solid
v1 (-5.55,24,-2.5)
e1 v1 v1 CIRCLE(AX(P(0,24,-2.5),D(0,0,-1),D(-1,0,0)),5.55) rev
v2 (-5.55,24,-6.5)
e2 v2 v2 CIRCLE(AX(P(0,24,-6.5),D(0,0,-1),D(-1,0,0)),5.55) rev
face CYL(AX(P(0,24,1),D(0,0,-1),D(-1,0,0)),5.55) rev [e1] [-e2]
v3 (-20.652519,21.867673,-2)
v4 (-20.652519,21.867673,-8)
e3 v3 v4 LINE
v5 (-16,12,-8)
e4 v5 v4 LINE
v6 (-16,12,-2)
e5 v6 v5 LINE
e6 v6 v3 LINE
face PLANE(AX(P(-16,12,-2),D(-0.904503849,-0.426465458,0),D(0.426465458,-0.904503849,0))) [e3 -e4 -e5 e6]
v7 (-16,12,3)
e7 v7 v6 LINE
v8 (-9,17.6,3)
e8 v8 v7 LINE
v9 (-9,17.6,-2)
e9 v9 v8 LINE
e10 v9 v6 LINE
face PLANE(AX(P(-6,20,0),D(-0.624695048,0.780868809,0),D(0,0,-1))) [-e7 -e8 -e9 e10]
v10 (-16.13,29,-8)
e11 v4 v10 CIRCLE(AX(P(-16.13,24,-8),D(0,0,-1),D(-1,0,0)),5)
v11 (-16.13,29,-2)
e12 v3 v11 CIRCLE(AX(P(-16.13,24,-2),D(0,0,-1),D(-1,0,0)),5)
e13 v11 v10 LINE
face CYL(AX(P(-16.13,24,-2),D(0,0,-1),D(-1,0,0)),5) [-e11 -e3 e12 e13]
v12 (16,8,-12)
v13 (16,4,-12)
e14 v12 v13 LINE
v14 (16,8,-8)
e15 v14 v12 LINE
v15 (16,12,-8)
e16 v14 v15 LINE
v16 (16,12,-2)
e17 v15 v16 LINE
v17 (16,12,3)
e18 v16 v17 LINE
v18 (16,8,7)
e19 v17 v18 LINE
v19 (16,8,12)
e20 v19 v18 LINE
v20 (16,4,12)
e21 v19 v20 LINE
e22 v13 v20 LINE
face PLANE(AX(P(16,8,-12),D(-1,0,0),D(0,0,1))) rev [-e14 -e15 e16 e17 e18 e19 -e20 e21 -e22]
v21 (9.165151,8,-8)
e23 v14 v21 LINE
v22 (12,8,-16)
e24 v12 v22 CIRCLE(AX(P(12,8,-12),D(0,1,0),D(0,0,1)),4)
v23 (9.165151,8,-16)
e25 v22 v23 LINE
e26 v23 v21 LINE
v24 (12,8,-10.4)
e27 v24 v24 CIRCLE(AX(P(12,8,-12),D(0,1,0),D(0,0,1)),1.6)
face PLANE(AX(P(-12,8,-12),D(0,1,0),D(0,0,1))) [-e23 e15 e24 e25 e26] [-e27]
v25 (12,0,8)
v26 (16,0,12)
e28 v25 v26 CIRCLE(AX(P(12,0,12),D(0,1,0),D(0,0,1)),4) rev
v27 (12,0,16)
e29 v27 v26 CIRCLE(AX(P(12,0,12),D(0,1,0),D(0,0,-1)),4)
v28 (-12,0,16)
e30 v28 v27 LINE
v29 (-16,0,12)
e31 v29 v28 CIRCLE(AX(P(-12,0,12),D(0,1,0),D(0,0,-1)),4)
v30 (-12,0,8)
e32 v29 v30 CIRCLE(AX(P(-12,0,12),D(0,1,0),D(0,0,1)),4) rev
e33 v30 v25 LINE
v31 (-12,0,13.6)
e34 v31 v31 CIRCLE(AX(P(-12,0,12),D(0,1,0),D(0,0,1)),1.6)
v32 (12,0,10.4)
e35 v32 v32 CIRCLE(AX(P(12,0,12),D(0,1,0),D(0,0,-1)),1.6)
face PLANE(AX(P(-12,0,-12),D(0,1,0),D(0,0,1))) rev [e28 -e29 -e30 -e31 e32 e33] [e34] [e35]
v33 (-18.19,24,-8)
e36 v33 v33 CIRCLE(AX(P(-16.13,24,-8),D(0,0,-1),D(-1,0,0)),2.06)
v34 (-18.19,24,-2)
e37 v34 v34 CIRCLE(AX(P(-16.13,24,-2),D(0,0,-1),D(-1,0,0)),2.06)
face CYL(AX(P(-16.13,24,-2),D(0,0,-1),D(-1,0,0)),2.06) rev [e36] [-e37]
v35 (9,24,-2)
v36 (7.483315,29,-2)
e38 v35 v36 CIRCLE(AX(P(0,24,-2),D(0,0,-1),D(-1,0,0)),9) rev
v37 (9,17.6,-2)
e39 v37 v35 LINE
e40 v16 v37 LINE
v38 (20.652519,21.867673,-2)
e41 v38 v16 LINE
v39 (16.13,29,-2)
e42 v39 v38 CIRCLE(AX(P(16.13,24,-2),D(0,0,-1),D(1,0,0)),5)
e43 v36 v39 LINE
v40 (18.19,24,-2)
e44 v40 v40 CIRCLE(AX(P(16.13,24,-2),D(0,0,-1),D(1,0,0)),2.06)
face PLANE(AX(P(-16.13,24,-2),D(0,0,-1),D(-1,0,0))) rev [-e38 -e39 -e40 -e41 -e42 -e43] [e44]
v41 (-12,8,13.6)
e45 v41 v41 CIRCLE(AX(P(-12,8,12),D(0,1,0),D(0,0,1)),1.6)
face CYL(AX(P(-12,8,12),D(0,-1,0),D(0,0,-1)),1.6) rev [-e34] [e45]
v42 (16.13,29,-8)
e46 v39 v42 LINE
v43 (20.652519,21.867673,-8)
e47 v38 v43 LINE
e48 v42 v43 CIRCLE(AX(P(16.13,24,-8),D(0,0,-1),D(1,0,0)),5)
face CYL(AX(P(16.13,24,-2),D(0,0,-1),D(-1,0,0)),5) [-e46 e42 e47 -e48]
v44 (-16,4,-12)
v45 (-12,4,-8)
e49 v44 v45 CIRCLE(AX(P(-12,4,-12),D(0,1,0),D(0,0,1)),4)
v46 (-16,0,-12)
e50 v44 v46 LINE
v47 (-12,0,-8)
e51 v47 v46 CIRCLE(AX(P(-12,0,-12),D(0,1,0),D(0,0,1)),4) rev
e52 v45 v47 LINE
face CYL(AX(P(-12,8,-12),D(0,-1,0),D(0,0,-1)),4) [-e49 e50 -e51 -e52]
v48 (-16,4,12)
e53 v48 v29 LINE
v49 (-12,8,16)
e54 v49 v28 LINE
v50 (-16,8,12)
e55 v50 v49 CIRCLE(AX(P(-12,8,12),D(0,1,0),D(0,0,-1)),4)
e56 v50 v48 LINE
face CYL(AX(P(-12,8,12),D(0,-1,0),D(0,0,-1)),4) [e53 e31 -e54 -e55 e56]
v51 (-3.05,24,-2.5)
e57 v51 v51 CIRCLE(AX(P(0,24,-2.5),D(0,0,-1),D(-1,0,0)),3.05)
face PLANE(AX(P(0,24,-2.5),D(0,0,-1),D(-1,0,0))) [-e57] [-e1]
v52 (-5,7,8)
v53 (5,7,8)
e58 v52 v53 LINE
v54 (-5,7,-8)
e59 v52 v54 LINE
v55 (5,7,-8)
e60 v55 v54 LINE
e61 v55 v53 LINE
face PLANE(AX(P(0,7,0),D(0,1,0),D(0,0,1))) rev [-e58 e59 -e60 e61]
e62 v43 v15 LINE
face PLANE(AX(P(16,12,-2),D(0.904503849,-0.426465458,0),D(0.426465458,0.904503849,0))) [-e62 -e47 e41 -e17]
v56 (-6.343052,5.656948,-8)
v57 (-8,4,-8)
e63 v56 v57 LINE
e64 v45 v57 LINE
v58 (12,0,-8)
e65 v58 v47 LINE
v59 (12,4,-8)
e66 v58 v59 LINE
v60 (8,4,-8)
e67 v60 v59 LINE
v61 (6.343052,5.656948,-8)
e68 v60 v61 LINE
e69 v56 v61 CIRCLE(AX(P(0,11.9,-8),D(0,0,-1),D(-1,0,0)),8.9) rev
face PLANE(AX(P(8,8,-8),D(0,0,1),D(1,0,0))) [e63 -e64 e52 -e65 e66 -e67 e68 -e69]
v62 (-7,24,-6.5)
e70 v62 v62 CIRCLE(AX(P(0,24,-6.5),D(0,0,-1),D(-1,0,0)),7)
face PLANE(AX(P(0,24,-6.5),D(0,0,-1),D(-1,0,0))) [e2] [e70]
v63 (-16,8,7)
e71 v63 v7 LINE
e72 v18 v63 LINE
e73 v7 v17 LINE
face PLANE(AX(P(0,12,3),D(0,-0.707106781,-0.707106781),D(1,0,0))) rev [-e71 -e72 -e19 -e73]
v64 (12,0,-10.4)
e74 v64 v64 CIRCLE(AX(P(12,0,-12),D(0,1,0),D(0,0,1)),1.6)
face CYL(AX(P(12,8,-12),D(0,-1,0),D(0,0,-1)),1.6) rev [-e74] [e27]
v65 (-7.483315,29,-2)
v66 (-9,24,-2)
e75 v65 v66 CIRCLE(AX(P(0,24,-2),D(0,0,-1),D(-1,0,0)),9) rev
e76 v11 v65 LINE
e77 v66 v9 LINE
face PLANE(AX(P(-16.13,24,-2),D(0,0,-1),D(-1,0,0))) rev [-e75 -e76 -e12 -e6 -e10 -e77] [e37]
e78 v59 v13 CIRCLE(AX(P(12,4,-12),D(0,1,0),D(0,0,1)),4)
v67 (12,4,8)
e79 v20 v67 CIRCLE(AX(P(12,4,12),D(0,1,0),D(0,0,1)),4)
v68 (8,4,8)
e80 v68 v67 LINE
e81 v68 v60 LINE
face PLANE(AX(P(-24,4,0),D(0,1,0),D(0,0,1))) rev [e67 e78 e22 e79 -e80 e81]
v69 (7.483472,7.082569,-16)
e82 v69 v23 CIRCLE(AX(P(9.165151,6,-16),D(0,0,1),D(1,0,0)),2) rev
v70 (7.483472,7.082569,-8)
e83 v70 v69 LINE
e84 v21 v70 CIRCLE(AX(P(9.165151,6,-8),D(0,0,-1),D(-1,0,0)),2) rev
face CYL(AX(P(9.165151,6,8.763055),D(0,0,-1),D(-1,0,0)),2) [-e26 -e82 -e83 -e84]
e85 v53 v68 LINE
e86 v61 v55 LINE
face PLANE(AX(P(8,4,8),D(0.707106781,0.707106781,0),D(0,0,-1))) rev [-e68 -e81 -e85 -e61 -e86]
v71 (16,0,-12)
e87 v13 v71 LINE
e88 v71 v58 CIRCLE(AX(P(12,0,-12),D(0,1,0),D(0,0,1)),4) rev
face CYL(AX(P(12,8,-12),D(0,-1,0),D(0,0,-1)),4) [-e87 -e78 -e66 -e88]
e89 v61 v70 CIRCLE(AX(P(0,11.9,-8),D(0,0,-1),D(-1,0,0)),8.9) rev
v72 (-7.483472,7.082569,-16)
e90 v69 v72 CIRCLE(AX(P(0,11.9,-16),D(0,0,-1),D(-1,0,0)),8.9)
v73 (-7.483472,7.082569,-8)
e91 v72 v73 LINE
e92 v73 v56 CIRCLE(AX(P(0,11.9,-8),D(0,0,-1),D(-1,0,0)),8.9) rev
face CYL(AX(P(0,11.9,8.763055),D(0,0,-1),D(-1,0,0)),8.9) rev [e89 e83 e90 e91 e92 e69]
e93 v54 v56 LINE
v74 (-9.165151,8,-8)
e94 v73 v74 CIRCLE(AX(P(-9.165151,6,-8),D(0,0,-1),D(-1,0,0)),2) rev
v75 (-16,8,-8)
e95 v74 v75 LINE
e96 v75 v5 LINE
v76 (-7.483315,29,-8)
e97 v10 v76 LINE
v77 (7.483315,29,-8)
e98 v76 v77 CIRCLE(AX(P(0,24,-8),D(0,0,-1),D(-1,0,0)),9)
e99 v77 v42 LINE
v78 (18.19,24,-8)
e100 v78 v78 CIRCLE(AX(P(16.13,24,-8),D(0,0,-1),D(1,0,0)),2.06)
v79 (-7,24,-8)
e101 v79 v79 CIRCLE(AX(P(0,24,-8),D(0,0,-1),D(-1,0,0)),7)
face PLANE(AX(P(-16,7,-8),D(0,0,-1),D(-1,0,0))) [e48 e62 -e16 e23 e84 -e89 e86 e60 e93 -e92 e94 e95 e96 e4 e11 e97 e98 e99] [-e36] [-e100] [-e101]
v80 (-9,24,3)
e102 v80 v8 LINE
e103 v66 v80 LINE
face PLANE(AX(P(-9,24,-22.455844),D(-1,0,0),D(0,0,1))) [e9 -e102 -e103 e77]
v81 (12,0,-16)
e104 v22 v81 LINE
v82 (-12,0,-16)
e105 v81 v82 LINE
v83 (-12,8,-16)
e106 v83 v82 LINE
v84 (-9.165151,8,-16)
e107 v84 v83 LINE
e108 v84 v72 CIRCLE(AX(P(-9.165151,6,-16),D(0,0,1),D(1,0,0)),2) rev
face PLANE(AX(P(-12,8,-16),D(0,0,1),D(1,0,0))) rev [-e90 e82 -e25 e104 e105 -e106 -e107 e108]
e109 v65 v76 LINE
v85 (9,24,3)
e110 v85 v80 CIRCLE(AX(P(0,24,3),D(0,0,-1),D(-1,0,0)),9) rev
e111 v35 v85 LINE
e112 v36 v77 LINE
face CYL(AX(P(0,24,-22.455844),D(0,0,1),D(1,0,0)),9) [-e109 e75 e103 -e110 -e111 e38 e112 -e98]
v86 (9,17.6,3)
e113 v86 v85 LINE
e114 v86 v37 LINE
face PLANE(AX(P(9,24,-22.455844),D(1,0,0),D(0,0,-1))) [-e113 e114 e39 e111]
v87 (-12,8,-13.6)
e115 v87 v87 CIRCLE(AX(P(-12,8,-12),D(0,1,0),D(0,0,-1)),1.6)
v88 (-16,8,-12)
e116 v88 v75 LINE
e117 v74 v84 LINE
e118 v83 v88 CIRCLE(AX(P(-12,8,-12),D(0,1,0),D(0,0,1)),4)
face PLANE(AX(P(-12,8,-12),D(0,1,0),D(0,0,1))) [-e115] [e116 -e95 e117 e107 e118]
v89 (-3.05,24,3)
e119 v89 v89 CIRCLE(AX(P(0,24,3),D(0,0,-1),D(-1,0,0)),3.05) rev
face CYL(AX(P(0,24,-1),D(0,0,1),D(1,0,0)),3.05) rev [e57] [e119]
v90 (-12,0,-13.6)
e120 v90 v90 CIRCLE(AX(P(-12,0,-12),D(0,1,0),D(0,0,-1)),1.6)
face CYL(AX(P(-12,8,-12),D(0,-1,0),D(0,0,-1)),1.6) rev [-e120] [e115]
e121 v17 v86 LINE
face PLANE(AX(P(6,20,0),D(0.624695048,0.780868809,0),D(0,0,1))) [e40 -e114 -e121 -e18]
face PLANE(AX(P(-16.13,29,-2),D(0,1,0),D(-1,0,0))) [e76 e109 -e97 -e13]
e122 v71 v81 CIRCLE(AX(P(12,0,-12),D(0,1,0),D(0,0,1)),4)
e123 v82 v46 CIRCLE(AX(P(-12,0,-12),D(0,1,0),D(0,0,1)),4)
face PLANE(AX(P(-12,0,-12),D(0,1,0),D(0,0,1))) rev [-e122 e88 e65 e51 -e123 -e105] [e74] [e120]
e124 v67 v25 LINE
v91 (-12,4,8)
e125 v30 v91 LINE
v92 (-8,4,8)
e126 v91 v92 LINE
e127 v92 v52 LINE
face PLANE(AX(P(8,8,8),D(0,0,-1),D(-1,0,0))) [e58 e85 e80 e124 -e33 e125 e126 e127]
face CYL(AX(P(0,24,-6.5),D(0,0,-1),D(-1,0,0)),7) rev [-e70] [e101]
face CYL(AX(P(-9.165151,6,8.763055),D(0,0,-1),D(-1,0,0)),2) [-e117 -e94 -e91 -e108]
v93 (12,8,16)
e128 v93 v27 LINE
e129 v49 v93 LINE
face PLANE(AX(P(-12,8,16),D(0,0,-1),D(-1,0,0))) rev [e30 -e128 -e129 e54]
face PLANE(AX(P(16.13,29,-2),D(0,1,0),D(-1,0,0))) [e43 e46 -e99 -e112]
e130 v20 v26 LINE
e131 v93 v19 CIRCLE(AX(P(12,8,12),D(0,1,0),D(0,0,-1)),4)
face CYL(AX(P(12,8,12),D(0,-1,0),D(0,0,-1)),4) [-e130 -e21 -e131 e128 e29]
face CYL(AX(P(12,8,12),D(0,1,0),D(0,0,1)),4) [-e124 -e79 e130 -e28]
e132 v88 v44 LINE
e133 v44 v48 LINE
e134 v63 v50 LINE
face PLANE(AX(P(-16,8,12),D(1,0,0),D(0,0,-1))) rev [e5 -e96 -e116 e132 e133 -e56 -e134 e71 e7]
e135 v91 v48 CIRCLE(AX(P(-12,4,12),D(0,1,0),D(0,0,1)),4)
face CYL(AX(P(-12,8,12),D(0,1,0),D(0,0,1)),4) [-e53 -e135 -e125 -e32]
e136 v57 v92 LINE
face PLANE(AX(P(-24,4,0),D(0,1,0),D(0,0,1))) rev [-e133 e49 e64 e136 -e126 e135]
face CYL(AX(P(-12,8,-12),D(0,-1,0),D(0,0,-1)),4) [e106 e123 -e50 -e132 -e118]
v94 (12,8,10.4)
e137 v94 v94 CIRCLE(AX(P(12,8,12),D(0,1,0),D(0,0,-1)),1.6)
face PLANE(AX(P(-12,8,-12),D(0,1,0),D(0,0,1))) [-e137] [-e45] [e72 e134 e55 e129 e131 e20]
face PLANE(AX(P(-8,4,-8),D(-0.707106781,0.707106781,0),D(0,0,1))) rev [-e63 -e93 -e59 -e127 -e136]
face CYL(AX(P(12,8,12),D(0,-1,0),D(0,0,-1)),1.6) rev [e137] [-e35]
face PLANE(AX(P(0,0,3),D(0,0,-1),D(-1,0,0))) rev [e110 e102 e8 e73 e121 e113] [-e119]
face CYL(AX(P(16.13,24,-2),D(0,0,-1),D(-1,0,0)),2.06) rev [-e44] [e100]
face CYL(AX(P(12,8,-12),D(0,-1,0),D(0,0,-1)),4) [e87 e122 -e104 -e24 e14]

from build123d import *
from OCP.BRepFilletAPI import BRepFilletAPI_MakeChamfer
from build123d.topology import SkipClean

# Parameters (mm, degrees)
SKETCH1_R                = 1.6
SKETCH1_W                = 16
SKETCH1_H                = 16
BOSS_EXTRUDE1_DEPTH      = 8
SKETCH2_W                = 16
SKETCH2_H                = 4
CUT_EXTRUDE1_DEPTH       = 40
FILLET1_R                = 4
BOSS_EXTRUDE5_DEPTH      = 12
BOSS_EXTRUDE5_DEPTH_BACK = 1
SKETCH3_W                = 32
SKETCH3_H                = 5
CHAMFER1_SIZE            = 3
CHAMFER2_SIZE            = 8
CHAMFER2_SIZE2           = 10
SKETCH5_W                = 12
SKETCH5_H                = 5
BOSS_EXTRUDE7_DEPTH      = 8
FILLET2_R                = 4
SKETCH6_R                = 1.6
CUT_EXTRUDE2_DEPTH       = 20
SKETCH7_R                = 3.05
CUT_EXTRUDE3_DEPTH       = 9
SKETCH8_R                = 3.05
BOSS_EXTRUDE8_DEPTH      = 5
BOSS_EXTRUDE9_START      = -5
SKETCH9_R                = 1.6
BOSS_EXTRUDE9_DEPTH      = 5
SKETCH10_R               = 5.55
CUT_EXTRUDE4_DEPTH       = 9
BOSS_EXTRUDE11_START     = 6
SKETCH11_R               = 5.55
BOSS_EXTRUDE11_DEPTH     = 6
SKETCH12_R               = 7.71946315
SKETCH12_R_2             = 3.05
BOSS_EXTRUDE12_DEPTH     = 5.5
SKETCH14_R               = 7
CUT_EXTRUDE6_DEPTH       = 1.5
CUT_EXTRUDE8_DEPTH       = 5
BOSS_EXTRUDE13_START     = -6
SKETCH19_R               = 2.06
SKETCH19_R_2             = 7
BOSS_EXTRUDE13_DEPTH     = 6
CUT_EXTRUDE9_DEPTH       = 8
FILLET3_R                = 2
CHAMFER3_SIZE            = 4


# Some blends are built 0.0001 mm under size
with BuildPart() as part:
    # Sketch1 → Boss-Extrude1 (new body)
    with BuildSketch(Plane(origin=(0, 0, 0), x_dir=(1, 0, 0), z_dir=(0, 1, 0))):
        with BuildLine():
            Line((-12, 16), (12, 16))
            ThreePointArc((12, 16), (14.828427125, 14.828427125), (16, 12))
            Line((16, 12), (16, -12))
            ThreePointArc((16, -12), (14.828427125, -14.828427125), (12, -16))
            Line((12, -16), (-12, -16))
            ThreePointArc((-12, -16), (-14.828427125, -14.828427125), (-16, -12))
            Line((-16, -12), (-16, 12))
            ThreePointArc((-16, 12), (-14.828427125, 14.828427125), (-12, 16))
        make_face()
        with Locations(Location((12, 12, 0), (0, 0, 270))):
            Circle(SKETCH1_R, mode=Mode.SUBTRACT)
        with Locations(Location((-12, 12, 0), (0, 0, 90))):
            Circle(SKETCH1_R, mode=Mode.SUBTRACT)
        with Locations(Location((12, -12, 0), (0, 0, 90))):
            Circle(SKETCH1_R, mode=Mode.SUBTRACT)
        with Locations(Location((-12, -12, 0), (0, 0, 270))):
            Circle(SKETCH1_R, mode=Mode.SUBTRACT)
        Rectangle(SKETCH1_W, SKETCH1_H, mode=Mode.SUBTRACT)
    extrude(amount=BOSS_EXTRUDE1_DEPTH)

    # Sketch2 → Cut-Extrude1 (cut)
    with BuildSketch(Plane(origin=(16, 0, 0), x_dir=(0, 0, -1), z_dir=(1, 0, 0))):
        with Locations((0, 2)):
            Rectangle(SKETCH2_W, SKETCH2_H)
    extrude(amount=-CUT_EXTRUDE1_DEPTH, mode=Mode.SUBTRACT)

    # Fillet1
    fillet1_edges = [part.edges().sort_by_distance(p)[0] for p in [
        (-16, 2, -8),
        (16, 2, -8),
        (-16, 2, 8),
        (16, 2, 8),
    ]]
    fillet(fillet1_edges, radius=FILLET1_R - 0.0001)  # a hair under: the kernel refuses the full size

    # Sketch3 → Boss-Extrude5 (add, two sides: drawn at the far end of the back side and taken through both)
    with BuildSketch(Plane(origin=(0, 8, 0), x_dir=(1, 0, 0), z_dir=(0, 1, 0)).offset(-BOSS_EXTRUDE5_DEPTH_BACK)):
        with Locations((0, 5.5)):
            Rectangle(SKETCH3_W, SKETCH3_H)
        with Locations((0, -5.5)):
            Rectangle(SKETCH3_W, SKETCH3_H)
    extrude(amount=BOSS_EXTRUDE5_DEPTH + BOSS_EXTRUDE5_DEPTH_BACK)

    # Chamfer1
    chamfer1_edges = [part.edges().sort_by_distance(p)[0] for p in [
        (8, 7, 5.5),
        (8, 7, -5.5),
        (-8, 7, -5.5),
        (-8, 7, 5.5),
    ]]
    chamfer(chamfer1_edges, length=CHAMFER1_SIZE - 0.0001)  # a hair under: the kernel refuses the full size

    # Chamfer2: one chamfer whose edges measure the first distance from different faces: ONE call of the kernel's chamfer builder (chamfer() names one face for all edges)
    chamfer2_edges_1 = [part.edges().sort_by_distance(p)[0] for p in [
        (-16, 20, -5.5),
        (-16, 20, 5.5),
    ]]
    chamfer2_side_1 = [part.faces().sort_by_distance(p)[0] for p in [
        (-16, 0.312409987, 11.99995),
    ]]
    chamfer2_edges_2 = [part.edges().sort_by_distance(p)[0] for p in [
        (16, 20, -5.5),
        (16, 20, 5.5),
    ]]
    chamfer2_side_2 = [part.faces().sort_by_distance(p)[0] for p in [
        (16, 0.312409987, -11.99995),
    ]]
    chamfer2 = BRepFilletAPI_MakeChamfer(part.part.solid().wrapped)
    for e in chamfer2_edges_1:
        chamfer2.Add(CHAMFER2_SIZE, CHAMFER2_SIZE2, e.wrapped, chamfer2_side_1[0].wrapped)  # the first distance lies on this face
    for e in chamfer2_edges_2:
        chamfer2.Add(CHAMFER2_SIZE, CHAMFER2_SIZE2, e.wrapped, chamfer2_side_2[0].wrapped)  # the first distance lies on this face
    add(Compound.cast(chamfer2.Shape()), mode=Mode.REPLACE)

    # Sketch5 → Boss-Extrude7 (add)
    with BuildSketch(Plane(origin=(0, 20, 0), x_dir=(1, 0, 0), z_dir=(0, 1, 0))):
        with Locations((0, 5.5)):
            Rectangle(SKETCH5_W, SKETCH5_H)
        with Locations((0, -5.5)):
            Rectangle(SKETCH5_W, SKETCH5_H)
    extrude(amount=BOSS_EXTRUDE7_DEPTH)

    # Fillet2
    fillet2_edges = [part.edges().sort_by_distance(p)[0] for p in [
        (-6, 28, -5.5),
        (6, 28, -5.5),
        (-6, 28, 5.5),
        (6, 28, 5.5),
    ]]
    fillet(fillet2_edges, radius=FILLET2_R)

    # Sketch6 → Cut-Extrude2 (cut)
    with BuildSketch(Plane.XY.offset(8)):
        with Locations((0, 24)):
            Circle(SKETCH6_R)
    extrude(amount=-CUT_EXTRUDE2_DEPTH, mode=Mode.SUBTRACT)

    # Sketch7 → Cut-Extrude3 (cut)
    with BuildSketch(Plane.XY.offset(8)):
        with Locations((0, 24)):
            Circle(SKETCH7_R)
    extrude(amount=-CUT_EXTRUDE3_DEPTH, mode=Mode.SUBTRACT)

    # Sketch8 → Boss-Extrude8 (add)
    with BuildSketch(Plane.XY.offset(8)):
        with BuildLine():
            Line((-9, 24), (-9, 15))
            Line((-9, 15), (0, 15))
            Line((0, 15), (9, 15))
            Line((9, 15), (9, 24))
            ThreePointArc((9, 24), (0, 33), (-9, 24))
        make_face()
        with Locations((0, 24)):
            Circle(SKETCH8_R, mode=Mode.SUBTRACT)
    extrude(amount=-BOSS_EXTRUDE8_DEPTH)

    # Sketch9 → Boss-Extrude9 (add)
    with BuildSketch(Plane(origin=(0, 0, -8), x_dir=(-1, 0, 0), z_dir=(0, 0, -1)).offset(BOSS_EXTRUDE9_START)):
        with BuildLine():
            Line((-9, 24), (-9, 11))
            Line((-9, 11), (9, 11))
            Line((9, 11), (9, 24))
            ThreePointArc((9, 24), (0, 33), (-9, 24))
        make_face()
        with Locations(Location((0, 24, 0), (0, 0, 180))):
            Circle(SKETCH9_R, mode=Mode.SUBTRACT)
    extrude(amount=BOSS_EXTRUDE9_DEPTH)

    # Sketch10 → Cut-Extrude4 (cut)
    with BuildSketch(Plane(origin=(0, 0, -8), x_dir=(-1, 0, 0), z_dir=(0, 0, -1))):
        with Locations((0, 24)):
            Circle(SKETCH10_R)
    extrude(amount=-CUT_EXTRUDE4_DEPTH, mode=Mode.SUBTRACT)

    # Sketch11 → Boss-Extrude11 (add)
    with SkipClean():  # the faces are left unmerged after this step: merging them gives an invalid solid
        with BuildSketch(Plane.XY.offset(-3).offset(BOSS_EXTRUDE11_START)):
            with BuildLine():
                Line((-9, 24), (-9, 17.6))
                Line((-9, 17.6), (-16, 12))
                Line((-16, 12), (-16, 8))
                Line((-16, 8), (-8, 8))
                Line((-8, 8), (-8, 4))
                Line((-8, 4), (-5, 7))
                Line((-5, 7), (5, 7))
                Line((5, 7), (8, 4))
                Line((8, 4), (8, 8))
                Line((8, 8), (16, 8))
                Line((16, 8), (16, 12))
                Line((16, 12), (9, 17.6))
                Line((9, 17.6), (9, 24))
                ThreePointArc((9, 24), (0, 33), (-9, 24))
            make_face()
            with Locations(Location((0, 24, 0), (0, 0, 180))):
                Circle(SKETCH11_R, mode=Mode.SUBTRACT)
        extrude(amount=-BOSS_EXTRUDE11_DEPTH)

    # Sketch12 → Boss-Extrude12 (add)
    with BuildSketch(Plane(origin=(0, 0, 3), x_dir=(-1, 0, 0), z_dir=(0, 0, -1))):
        with Locations((0, 24)):
            Circle(SKETCH12_R)
        with Locations(Location((0, 24, 0), (0, 0, 180))):
            Circle(SKETCH12_R_2, mode=Mode.SUBTRACT)
    extrude(amount=BOSS_EXTRUDE12_DEPTH)

    # Sketch14 → Cut-Extrude6 (cut)
    with BuildSketch(Plane(origin=(0, 0, -8), x_dir=(-1, 0, 0), z_dir=(0, 0, -1))):
        with Locations((0, 24)):
            Circle(SKETCH14_R)
    extrude(amount=-CUT_EXTRUDE6_DEPTH, mode=Mode.SUBTRACT)

    # Sketch16 → Cut-Extrude8 (cut)
    with SkipClean():  # the faces are left unmerged after this step: merging them gives an invalid solid
        with BuildSketch(Plane.XY.offset(8)):
            Polygon((-16, 8), (16, 8), (29.507054263, 32.870046285), (-4.901166162, 51.167615183), (-28.978076235, 29.234025221), align=None)
        extrude(amount=-CUT_EXTRUDE8_DEPTH, mode=Mode.SUBTRACT)

    # Sketch19 → Boss-Extrude13 (add)
    with SkipClean():  # the faces are left unmerged after this step: merging them gives an invalid solid
        with BuildSketch(Plane(origin=(0, 0, -8), x_dir=(-1, 0, 0), z_dir=(0, 0, -1)).offset(BOSS_EXTRUDE13_START)):
            with BuildLine():
                Line((16.13, 29), (7.483314774, 29))
                ThreePointArc((7.483314774, 29), (0, 33), (-7.483314774, 29))
                Line((-7.483314774, 29), (-16.13, 29))
                ThreePointArc((-16.13, 29), (-20.352655353, 26.677532777), (-20.652519245, 21.867672708))
                Line((-20.652519245, 21.867672708), (-16, 12))
                Line((-16, 12), (16, 12))
                Line((16, 12), (20.652519245, 21.867672708))
                ThreePointArc((20.652519245, 21.867672708), (20.352655353, 26.677532777), (16.13, 29))
            make_face()
            with Locations((16.13, 24)):
                Circle(SKETCH19_R, mode=Mode.SUBTRACT)
            with Locations(Location((-16.13, 24, 0), (0, 0, 180))):
                Circle(SKETCH19_R, mode=Mode.SUBTRACT)
            with Locations((0, 24)):
                Circle(SKETCH19_R_2, mode=Mode.SUBTRACT)
        extrude(amount=BOSS_EXTRUDE13_DEPTH)

    # Sketch21 → Cut-Extrude9 (cut)
    with SkipClean():  # the faces are left unmerged after this step: merging them gives an invalid solid
        with BuildSketch(Plane(origin=(0, 0, -16), x_dir=(-1, 0, 0), z_dir=(0, 0, -1))):
            with BuildLine():
                Line((8, 8), (0, 8))
                Line((0, 8), (0, 3))
                ThreePointArc((0, 3), (4.716990566, 4.352815094), (8, 8))
            make_face()
            with BuildLine():
                Line((0, 3), (0, 8))
                Line((0, 8), (-8, 8))
                ThreePointArc((-8, 8), (-4.716990566, 4.352815094), (0, 3))
            make_face()
        extrude(amount=-CUT_EXTRUDE9_DEPTH, mode=Mode.SUBTRACT)

    # Fillet3
    # the kernel refuses this fillet: 2 mm, written as the material it takes off along each edge
    with BuildSketch(Plane(origin=(8, 8, -18.912878475), x_dir=(1, 0, 0), z_dir=(0, 0, 1))) as fillet3_piece_1:
        with BuildLine():
            CenterArc((1.16515139, -2), FILLET3_R, 90, 57.22888336)
            ThreePointArc((-0.516527764, -0.917431193), (-0.244685814, -0.466360256), (0, 0))
            Line((0, 0), (1.16515139, 0))
        make_face()
    extrude(amount=10.912878475, mode=Mode.SUBTRACT)
    with BuildSketch(Plane(origin=(-8, 8, -18.912878475), x_dir=(-1, 0, 0), z_dir=(0, 0, 1))) as fillet3_piece_2:
        with BuildLine():
            CenterArc((1.16515139, 2), FILLET3_R, 212.77111664, 57.22888336)
            ThreePointArc((-0.516527764, 0.917431193), (-0.244685814, 0.466360256), (0, 0))
            Line((0, 0), (1.16515139, 0))
        make_face()
    extrude(amount=10.912878475, mode=Mode.SUBTRACT)

    # Chamfer3
    chamfer3_edges = [part.edges().sort_by_distance(p)[0] for p in [
        (0, 8, 3),
    ]]
    chamfer(chamfer3_edges, length=CHAMFER3_SIZE)


solid = part.part
